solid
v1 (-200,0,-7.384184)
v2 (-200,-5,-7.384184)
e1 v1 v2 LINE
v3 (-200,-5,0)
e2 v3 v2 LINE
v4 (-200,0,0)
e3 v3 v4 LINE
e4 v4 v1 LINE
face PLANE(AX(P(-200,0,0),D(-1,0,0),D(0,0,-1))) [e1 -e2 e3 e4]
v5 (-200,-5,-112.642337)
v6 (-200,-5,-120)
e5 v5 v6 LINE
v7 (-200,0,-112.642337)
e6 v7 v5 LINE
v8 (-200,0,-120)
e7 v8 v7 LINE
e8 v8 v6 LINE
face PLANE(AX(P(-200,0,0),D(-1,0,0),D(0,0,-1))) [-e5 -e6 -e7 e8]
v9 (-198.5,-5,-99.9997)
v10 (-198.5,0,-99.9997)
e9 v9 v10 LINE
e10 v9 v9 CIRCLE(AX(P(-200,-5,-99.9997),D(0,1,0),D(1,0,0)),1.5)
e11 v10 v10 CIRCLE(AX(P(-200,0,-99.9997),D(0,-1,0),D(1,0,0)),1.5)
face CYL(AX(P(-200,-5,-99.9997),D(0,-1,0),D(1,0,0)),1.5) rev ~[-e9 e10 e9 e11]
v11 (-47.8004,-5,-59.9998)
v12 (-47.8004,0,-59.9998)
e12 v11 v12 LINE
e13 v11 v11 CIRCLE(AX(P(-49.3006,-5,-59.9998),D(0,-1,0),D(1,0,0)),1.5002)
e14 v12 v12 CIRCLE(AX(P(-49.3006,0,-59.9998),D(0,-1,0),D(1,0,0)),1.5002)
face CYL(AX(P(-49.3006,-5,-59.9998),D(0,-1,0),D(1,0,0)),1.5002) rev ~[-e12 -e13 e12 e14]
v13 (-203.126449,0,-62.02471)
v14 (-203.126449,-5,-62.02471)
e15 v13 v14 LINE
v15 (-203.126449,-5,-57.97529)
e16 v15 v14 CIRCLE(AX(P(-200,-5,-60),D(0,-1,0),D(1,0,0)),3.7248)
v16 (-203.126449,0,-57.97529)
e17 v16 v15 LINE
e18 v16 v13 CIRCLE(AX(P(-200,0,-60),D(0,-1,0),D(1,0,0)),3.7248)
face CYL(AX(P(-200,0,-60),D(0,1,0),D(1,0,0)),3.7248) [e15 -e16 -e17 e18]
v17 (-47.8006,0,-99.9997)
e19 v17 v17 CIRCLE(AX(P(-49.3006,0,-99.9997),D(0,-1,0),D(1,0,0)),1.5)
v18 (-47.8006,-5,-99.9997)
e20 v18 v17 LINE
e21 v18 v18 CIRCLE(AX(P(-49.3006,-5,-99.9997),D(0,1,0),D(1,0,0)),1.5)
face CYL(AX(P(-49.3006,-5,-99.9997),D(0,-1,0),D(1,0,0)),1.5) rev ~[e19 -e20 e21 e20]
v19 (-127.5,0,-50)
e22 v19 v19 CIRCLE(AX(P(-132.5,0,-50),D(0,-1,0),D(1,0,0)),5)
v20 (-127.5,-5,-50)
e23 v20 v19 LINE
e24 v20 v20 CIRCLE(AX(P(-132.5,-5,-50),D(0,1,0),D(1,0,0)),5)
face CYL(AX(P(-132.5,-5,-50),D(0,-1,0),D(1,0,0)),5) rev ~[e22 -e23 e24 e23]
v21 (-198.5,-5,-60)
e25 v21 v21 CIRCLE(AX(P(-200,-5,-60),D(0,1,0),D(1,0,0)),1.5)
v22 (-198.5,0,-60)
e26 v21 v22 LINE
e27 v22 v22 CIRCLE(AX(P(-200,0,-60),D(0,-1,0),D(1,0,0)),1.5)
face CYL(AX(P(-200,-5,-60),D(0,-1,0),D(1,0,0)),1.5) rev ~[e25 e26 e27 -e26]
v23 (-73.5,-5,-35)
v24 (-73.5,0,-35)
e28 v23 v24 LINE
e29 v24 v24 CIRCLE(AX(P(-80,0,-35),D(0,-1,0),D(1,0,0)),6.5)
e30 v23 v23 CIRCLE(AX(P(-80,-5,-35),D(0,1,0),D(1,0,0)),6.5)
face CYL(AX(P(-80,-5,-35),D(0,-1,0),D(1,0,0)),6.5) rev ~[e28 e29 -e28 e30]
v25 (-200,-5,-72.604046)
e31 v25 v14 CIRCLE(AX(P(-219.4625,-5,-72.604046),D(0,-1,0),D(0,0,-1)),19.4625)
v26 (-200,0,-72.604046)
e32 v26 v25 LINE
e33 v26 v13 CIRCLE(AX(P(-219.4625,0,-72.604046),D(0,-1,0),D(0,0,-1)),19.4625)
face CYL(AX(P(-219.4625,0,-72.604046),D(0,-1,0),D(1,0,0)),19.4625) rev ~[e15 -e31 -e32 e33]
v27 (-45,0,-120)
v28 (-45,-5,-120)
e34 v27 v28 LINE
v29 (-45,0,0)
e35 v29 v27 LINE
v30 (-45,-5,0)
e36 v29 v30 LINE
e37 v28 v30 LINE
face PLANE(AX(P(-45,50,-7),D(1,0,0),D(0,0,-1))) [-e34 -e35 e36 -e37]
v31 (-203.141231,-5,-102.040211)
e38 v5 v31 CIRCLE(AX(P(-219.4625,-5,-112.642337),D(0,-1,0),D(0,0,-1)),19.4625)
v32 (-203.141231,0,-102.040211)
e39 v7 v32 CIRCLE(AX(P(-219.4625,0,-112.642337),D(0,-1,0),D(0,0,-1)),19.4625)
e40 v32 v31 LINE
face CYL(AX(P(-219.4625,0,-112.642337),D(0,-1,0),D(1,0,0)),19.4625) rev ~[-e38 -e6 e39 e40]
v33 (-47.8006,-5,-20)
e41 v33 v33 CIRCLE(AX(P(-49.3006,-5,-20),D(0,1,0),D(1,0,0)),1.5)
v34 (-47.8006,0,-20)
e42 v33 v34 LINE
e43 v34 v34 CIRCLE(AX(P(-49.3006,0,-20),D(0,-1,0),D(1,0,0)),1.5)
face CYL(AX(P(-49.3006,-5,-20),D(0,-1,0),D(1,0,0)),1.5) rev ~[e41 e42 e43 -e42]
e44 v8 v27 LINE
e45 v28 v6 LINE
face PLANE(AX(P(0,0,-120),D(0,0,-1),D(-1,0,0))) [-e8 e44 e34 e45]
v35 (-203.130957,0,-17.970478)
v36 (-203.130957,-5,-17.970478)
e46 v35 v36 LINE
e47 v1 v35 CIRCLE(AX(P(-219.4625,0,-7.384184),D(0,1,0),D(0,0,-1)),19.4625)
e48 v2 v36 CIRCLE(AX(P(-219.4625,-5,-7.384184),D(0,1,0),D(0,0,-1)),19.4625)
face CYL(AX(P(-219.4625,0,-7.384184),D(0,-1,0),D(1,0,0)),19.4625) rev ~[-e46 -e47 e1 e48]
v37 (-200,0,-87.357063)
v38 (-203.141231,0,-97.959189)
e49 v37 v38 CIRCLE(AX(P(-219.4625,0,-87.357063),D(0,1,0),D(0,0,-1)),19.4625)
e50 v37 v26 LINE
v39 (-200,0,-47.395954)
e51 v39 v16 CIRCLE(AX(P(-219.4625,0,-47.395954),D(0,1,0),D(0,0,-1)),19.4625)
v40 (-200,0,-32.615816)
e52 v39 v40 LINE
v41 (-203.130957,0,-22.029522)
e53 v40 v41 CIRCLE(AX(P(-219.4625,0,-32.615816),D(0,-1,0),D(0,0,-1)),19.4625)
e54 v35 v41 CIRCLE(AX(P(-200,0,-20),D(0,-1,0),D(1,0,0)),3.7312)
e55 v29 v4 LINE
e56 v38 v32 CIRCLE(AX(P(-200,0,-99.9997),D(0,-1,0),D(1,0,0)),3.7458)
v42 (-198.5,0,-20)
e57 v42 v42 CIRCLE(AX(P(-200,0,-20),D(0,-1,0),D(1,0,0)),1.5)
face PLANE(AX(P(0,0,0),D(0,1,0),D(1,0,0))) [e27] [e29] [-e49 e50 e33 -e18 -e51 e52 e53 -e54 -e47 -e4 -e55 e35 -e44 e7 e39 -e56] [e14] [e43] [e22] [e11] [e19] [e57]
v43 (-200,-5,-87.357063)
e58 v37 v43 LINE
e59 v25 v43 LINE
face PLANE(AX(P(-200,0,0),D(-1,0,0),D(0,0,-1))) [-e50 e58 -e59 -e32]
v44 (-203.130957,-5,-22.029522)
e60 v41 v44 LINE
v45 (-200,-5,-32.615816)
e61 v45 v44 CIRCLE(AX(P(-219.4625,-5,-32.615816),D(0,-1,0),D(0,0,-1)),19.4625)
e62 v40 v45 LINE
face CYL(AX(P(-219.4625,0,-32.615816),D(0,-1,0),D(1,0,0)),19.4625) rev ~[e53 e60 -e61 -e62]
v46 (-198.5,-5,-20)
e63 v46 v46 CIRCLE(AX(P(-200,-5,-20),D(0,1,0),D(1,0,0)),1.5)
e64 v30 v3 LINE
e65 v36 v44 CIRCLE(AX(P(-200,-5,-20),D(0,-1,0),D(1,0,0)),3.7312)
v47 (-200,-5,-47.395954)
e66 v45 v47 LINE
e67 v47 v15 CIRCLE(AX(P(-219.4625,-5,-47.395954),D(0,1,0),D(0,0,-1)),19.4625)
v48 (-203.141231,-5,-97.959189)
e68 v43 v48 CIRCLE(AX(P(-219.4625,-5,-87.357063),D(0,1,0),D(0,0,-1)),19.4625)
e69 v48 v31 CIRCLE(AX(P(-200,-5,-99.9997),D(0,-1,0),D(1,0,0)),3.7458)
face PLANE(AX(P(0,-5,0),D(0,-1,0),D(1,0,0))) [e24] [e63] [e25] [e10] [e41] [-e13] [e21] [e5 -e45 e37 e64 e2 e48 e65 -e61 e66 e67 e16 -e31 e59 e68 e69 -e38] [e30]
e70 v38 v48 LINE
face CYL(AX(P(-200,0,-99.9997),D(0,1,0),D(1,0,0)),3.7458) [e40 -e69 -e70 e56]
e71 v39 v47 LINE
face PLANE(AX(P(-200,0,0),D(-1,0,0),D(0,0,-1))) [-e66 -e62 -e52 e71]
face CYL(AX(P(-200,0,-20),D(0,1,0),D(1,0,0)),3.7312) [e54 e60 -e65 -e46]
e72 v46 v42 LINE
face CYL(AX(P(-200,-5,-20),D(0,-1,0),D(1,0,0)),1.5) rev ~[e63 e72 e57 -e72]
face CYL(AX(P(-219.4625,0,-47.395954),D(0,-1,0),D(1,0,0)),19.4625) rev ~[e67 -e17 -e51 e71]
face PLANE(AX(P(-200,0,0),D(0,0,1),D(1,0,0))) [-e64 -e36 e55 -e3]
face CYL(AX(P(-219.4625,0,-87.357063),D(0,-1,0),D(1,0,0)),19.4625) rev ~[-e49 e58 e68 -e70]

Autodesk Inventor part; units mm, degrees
ref_plane "YZ Plane" through (0, 0, 0) normal (1, 0, 0) x (0, 1, 0)
ref_plane "XZ Plane" through (0, 0, 0) normal (0, 1, 0) x (-1, 0, 0)
ref_plane "XY Plane" through (0, 0, 0) normal (0, 0, 1) x (1, 0, 0)
sketch "Sketch2" plane through (0, 0, 0) normal (0, 1, 0) x (-1, 0, 0)
  line L0 (0, 0) -> (200, 0)
  line L1 (200, 0) -> (200, -120)
  line L2 (200, -120) -> (0, -120)
  line L3 (0, -120) -> (0, 0)
  dimension "d0" = 200
  dimension "d1" = 120
extrude "Extrusion1" add sketch "Sketch2" along normal blind 50
sketch "Sketch3" plane through (0, 50, 0) normal (0, 1, 0) x (1, 0, 0)
  line L0 (0, 120) -> (-200, 120) projected
  line L1 (0, 120) -> (0, 113)
  line L2 (0, 0) -> (0, 120) projected
  line L3 (-200, 0) -> (0, 0) projected
  line L4 (0, 0) -> (0, 7)
  line L5 (0, 7) -> (-45, 7)
  line L6 (-45, 7) -> (-45, 113)
  line L7 (-45, 113) -> (0, 113)
  line L8 (0, 113) -> (0, 7)
  dimension "d4" = 7
  dimension "d5" = 7
  dimension "d6" = 45
extrude "Extrusion2" cut sketch "Sketch3" against normal blind 50
sketch "Sketch6" plane through (-200, 0, 0) normal (0, 0, 1) x (1, 0, 0)
  line L0 (200, 0) -> (200, 50) projected
  line L1 (200, 0) -> (205, 0)
  line L2 (205, 0) -> (205, 50)
  line L3 (205, 50) -> (200, 50)
  line L4 (200, 50) -> (200, 0)
  dimension "d42" = 5
extrude "Extrusion4" add sketch "Sketch6" against normal blind 7
sketch "Sketch7" plane through (0, 0, -120) normal (0, 0, -1) x (-1, 0, 0)
  line L0 (45, 50) -> (0, 50) projected
  line L1 (200, 0) -> (-5, 0) projected
  line L2 (0, 50) -> (-5, 50)
  line L3 (-5, 50) -> (-5, 0)
  line L4 (-5, 0) -> (0, 0)
  line L5 (0, 0) -> (0, 50)
extrude "Extrusion5" add sketch "Sketch7" against normal blind 7
sketch "Sketch8" plane through (0, 0, 0) normal (0, -1, 0) x (1, 0, 0)
  line L0 (-200, -120) -> (-200, 0) projected
  line L1 (-200, 0) -> (5, 0) projected
  line L2 (-200, 0) -> (-195, 0)
  line L3 (-45, -113) -> (-45, -7) projected
  line L4 (-200, -120) -> (5, -120) projected
  line L5 (-45, -113) -> (-52, -113)
  line L6 (-52, -113) -> (-52, -120)
  line L7 (-52, -120) -> (-45, -120)
  line L8 (-45, -120) -> (-45, -113)
  line L9 (-45, -7) -> (5, -7) projected
  line L10 (-45, -7) -> (-52, -7)
  line L11 (-52, -7) -> (-52, 0)
  line L12 (-52, 0) -> (-45, 0)
  line L13 (-45, 0) -> (-45, -7)
  line L14 (-200, 0) -> (-193, 0)
  line L15 (-193, 0) -> (-193, -7)
  line L16 (-193, -7) -> (-200, -7)
  line L17 (-200, -7) -> (-200, 0)
  line L18 (-200, -120) -> (-193, -120)
  line L19 (-193, -120) -> (-193, -113)
  line L20 (-193, -113) -> (-200, -113)
  line L21 (-200, -113) -> (-200, -120)
  line L22 (-193, -113) -> (-52, -113)
  line L23 (-52, -113) -> (-52, -7)
  line L24 (-52, -7) -> (-193, -7)
  line L25 (-193, -7) -> (-193, -113)
  point P0 (0, 0)
  dimension "d51" = 7
  dimension "d52" = 7
  dimension "d53" = 7
  dimension "d54" = 7
  dimension "d55" = 7
  dimension "d56" = 7
  dimension "d57" = 7
extrude "Extrusion6" cut sketch "Sketch8" against normal blind 45 contours L25 L24 L23 L22
sketch "Sketch9" plane through (-45, 50, -7) normal (1, 0, 0) x (0, 0, -1)
  line L0 (106, -50) -> (0, -50) projected
  line L1 (53, -50) -> (53, 0)
  line L2 (0, 0) -> (106, 0) projected
  line L3 (53, -25) -> (106, -25)
  line L4 (106, -25) -> (84, -25)
  line L5 (84, -25) -> (84, -15)
  line L6 (84, -25) -> (84, -35)
  line L7 (84, -35) -> (72, -35)
  line L8 (72, -35) -> (72, -15)
  line L9 (72, -15) -> (84, -15)
  line L10 (84, -15) -> (84, -35)
  line L11 (106, 0) -> (0, 0)
  line L12 (53, -25) -> (0, -25)
  line L13 (0, -25) -> (22, -25)
  line L14 (106, -25) -> (86, -25)
  line L15 (86, -25) -> (69.9067, -25)
  line L16 (69.9067, -25) -> (69.9067, -38.406)
  line L17 (69.9067, -38.406) -> (86, -38.406)
  line L18 (86, -38.406) -> (86, -25)
  line L19 (86, -25) -> (69.9067, -25)
  line L20 (69.9067, -25) -> (69.9067, -11.59)
  line L21 (69.9067, -11.59) -> (86, -11.59)
  line L22 (86, -11.59) -> (86, -25)
  line L23 (53, -25) -> (0, -25)
  line L24 (0, -25) -> (22, -25)
  line L25 (22, -25) -> (22, -15)
  line L26 (22, -25) -> (22, -35)
  line L27 (22, -35) -> (34, -35)
  line L28 (34, -35) -> (34, -15)
  line L29 (34, -15) -> (22, -15)
  line L30 (22, -15) -> (22, -35)
  line L31 (0, -25) -> (20, -25)
  line L32 (20, -25) -> (36.0933, -25)
  line L33 (36.0933, -25) -> (36.0933, -38.406)
  line L34 (36.0933, -38.406) -> (20, -38.406)
  line L35 (20, -38.406) -> (20, -25)
  line L36 (20, -25) -> (36.0933, -25)
  line L37 (36.0933, -25) -> (36.0933, -11.59)
  line L38 (36.0933, -11.59) -> (20, -11.59)
  line L39 (20, -11.59) -> (20, -25)
  point P0 (-7, -50)
  dimension "d60" = 22
  dimension "d61" = 10
  dimension "d62" = 10
  dimension "d63" = 12
  dimension "d66" = 20
  dimension "d67" = 13.41
  dimension "d68" = 13.4061
extrude "Extrusion8" cut sketch "Sketch9" against normal blind 10
sketch "Sketch10" plane through (0, 45, 0) normal (0, -1, 0) x (1, 0, 0)
  line L0 (-193, -113) -> (-193, -7) projected
  line L1 (-193, -60) -> (-148, -60)
  line L2 (-148, -7) -> (-143, -7)
  line L3 (-143, -7) -> (-143, -95.0021)
  line L4 (-143, -95.0021) -> (-148, -95.0021)
  line L5 (-148, -95.0021) -> (-148, -7)
  point P0 (0, 0)
  dimension "d71" = 45
  dimension "d72" = 5
extrude "Extrusion9" add sketch "Sketch10" along normal blind 40
sketch "Sketch11" plane through (0, 0, 0) normal (0, -1, 0) x (1, 0, 0)
  line L0 (-148, -7) -> (-148, -95.0021) projected
  line L1 (-148, -95.0021) -> (-148, -114.483)
  line L2 (-52, -113) -> (-193, -113) projected
  line L3 (-193, -113) -> (-148, -113)
  line L4 (-148, -113) -> (-148, -117)
  line L5 (-148, -117) -> (-193, -117)
  line L6 (-193, -117) -> (-193, -113)
  line L7 (-193, -7) -> (-52, -7) projected
  line L8 (-193, -7) -> (-148, -7)
  line L9 (-148, -7) -> (-148, -3)
  line L10 (-148, -3) -> (-193, -3)
  line L11 (-193, -3) -> (-193, -7)
  point P0 (0, 0)
  dimension "d75" = 4
  dimension "d76" = 4
extrude "Extrusion10" cut sketch "Sketch11" against normal blind 45
sketch "Sketch12" plane through (-52, 0, -113) normal (0, 0, 1) x (1, 0, 0)
  line L0 (0, 0) -> (0, 45) projected
  line L1 (0, 45) -> (-91, 45)
  line L2 (-91, 45) -> (-91, 0)
  line L3 (-91, 0) -> (0, 0)
  line L4 (0, 0) -> (0, 45)
  line L5 (-69.4543, 22.5) -> (-21.0513, 22.5) construction
  line L6 (-69.4543, 10.4971) -> (-21.0513, 10.4971)
  line L7 (-21.0513, 34.5029) -> (-69.4543, 34.5029)
  arc A0 (-69.4543, 34.5029) -> (-69.4543, 10.4971) centre (-69.4543, 22.5) ccw
  arc A1 (-21.0513, 10.4971) -> (-21.0513, 34.5029) centre (-21.0513, 22.5) ccw
  point P0 (52, 0)
  point P1 (-45.2528, 22.5)
extrude "Extrusion11" cut sketch "Sketch12" along normal mid plane 2000 contours A0 L7 A1 L6
sketch "Sketch13" plane through (0, 0, 0) normal (0, -1, 0) x (1, 0, 0)
  line L0 (-200, -120) -> (-200, 0) projected
  line L1 (-200, -60) -> (-200, -100)
  line L2 (-200, -100) -> (-200, -20)
  circle A0 centre (-200, -20) radius 3.75
  circle A1 centre (-200, -60) radius 3.75
  circle A2 centre (-200, -100) radius 3.75
  circle A3 centre (-49.267, -60) radius 3.75
  circle A4 centre (-49.267, -100) radius 3.75
  circle A5 centre (-49.267, -20) radius 3.75
  line L3 (-45, -113) -> (-45, -7) projected
  point P0 (0, 0)
  dimension "d81" = 40
  dimension "d82" = 80
  dimension "d83" = 7.5
  dimension "d84" = 7.5
  dimension "d85" = 7.5
extrude "Extrusion12" add sketch "Sketch13" against normal blind 17.5 contours A2 L0 | L0 A2 | A1 L0 | L0 A1 | A0 L0 | L0 A0 | A3
extrude "Extrusion13" add sketch "Sketch13" against normal blind 17.5 contours A3 | A4 | A5
sketch "Sketch16" plane through (0, 0, 0) normal (0, -1, 0) x (1, 0, 0)
  arc A0 (-200, -16.25) -> (-200, -23.75) centre (-200, -20) ccw projected
  circle A1 centre (-200, -20) radius 1.5
  line L0 (-200, -120) -> (-200, 0) projected
  circle A2 centre (-200, -60) radius 1.5
  circle A3 centre (-200, -99.9997) radius 1.5
  circle A4 centre (-49.3006, -99.9997) radius 1.5
  circle A5 centre (-49.3006, -60) radius 1.5
  circle A6 centre (-49.3006, -20) radius 1.5
  point P0 (0, 0)
  dimension "d90" = 3
  dimension "d91" = 3
  dimension "d92" = 3
  dimension "d93" = 3
  dimension "d94" = 3
  dimension "d95" = 3
extrude "Extrusion14" cut sketch "Sketch16" along normal mid plane 15 contours L0 A1 | A1 L0 | A3 L0 | L0 A3 | A2 L0 | L0 A2 | A4 | A5 | A6
fillet "Fillet1" radius 3.5875 3 edges at (-203.75, 17.5, -60) (-203.75, 17.5, -100) (-203.75, 17.5, -20)
fillet "Fillet2" radius 2 3 edges at (-53.017, 17.5, -100) (-53.017, 17.5, -60) (-53.017, 17.5, -20)
sketch "Sketch17" plane through (0, 45, 0) normal (0, -1, 0) x (1, 0, 0)
  line L0 (-148, -7) -> (-52, -7) projected
  line L1 (-142.7275, -7) -> (-52, -7)
  line L2 (-52, -7) -> (-52, -113)
  line L3 (-52, -113) -> (-142.7275, -113)
  circle A0 centre (-49.3006, -60) radius 1.5 projected
  line L4 (-49.3006, -60) -> (-200.2165, -60)
  line L5 (-121.4543, -7) -> (-73.0513, -7) projected
  line L6 (-97.2528, -7) -> (-64.7528, -7)
  line L7 (-64.7528, -7) -> (-97.2528, -7)
  line L8 (-97.2528, -7) -> (-129.7528, -7)
  line L9 (-148, -7) -> (-143, -7) projected
  line L10 (-143, -7) -> (-129.7528, -7)
  line L11 (-143, -7) -> (-64.7528, -7)
  circle A1 centre (-64.7528, -101.7496) radius 2
  circle A2 centre (-64.7528, -18.25) radius 2
  circle A3 centre (-129.7528, -18.25) radius 2
  circle A4 centre (-129.7528, -101.7496) radius 2
  point P0 (0, 0)
  dimension "d105" = 32.5
  dimension "d106" = 32.5
  dimension "d107" = 32.5
  dimension "d108" = 4
  dimension "d109" = 4
  dimension "d110" = 4
  dimension "d111" = 4
extrude "Extrusion15" cut sketch "Sketch17" against normal blind 15 contours A1 | A2 | A3 | A4
fillet "Fillet3" radius 19.4625 15 edges at (-200, 16.4492, -17.3007) (-200, 16.4492, -22.6993) (-200, 17.5, -20) (-200, 6.9562, -16.25) (-200, 6.9562, -23.75) (-200, 16.4492, -62.6992) (-200, 16.4492, -57.3008) (-200, 17.5, -60) (-200, 6.9562, -63.75) (-200, 6.9562, -56.25) (-200, 16.4492, -102.6993) (-200, 16.4492, -97.3007) (-200, 17.5, -100) (-200, 6.9562, -103.75) (-200, 6.9562, -96.25)
sketch "Sketch18" plane through (-200, 0, -120) normal (0, 0, -1) x (-1, 0, 0)
  line L0 (-155, 50) -> (-155, 0) projected
  line L1 (-155, 0) -> (-155, 50)
  circle A0 centre (0, 0) radius 11.05
  circle A1 centre (-15.5, 15.5) radius 1.75
  circle A2 centre (15.5, 15.5) radius 1.75
  circle A3 centre (15.5, -15.5) radius 1.75
  circle A4 centre (-15.5, -15.5) radius 1.75
  circle A5 centre (0, 0) radius 11.05
  circle A6 centre (-15.5, 15.5) radius 1.75
  circle A7 centre (15.5, 15.5) radius 1.75
  circle A8 centre (15.5, -15.5) radius 1.75
  circle A9 centre (-15.5, -15.5) radius 1.75
  circle A10 centre (0, 0) radius 11.05
  circle A11 centre (-15.5, 15.5) radius 1.75
  circle A12 centre (15.5, 15.5) radius 1.75
  circle A13 centre (15.5, -15.5) radius 1.75
  circle A14 centre (-15.5, -15.5) radius 1.75
  line L2 (-205, 0) -> (-205, 50) projected
  line L3 (-155, 0) -> (-205, 0)
  line L4 (-205, 0) -> (-205, 50)
  line L5 (-205, 50) -> (-155, 50)
  line L6 (-155, 50) -> (-155, 0)
  circle A15 centre (-180, 25) radius 11.5
  line L7 (-180, 25) -> (-164.5, 25)
  line L8 (-164.5, 25) -> (-164.5, 50)
  line L9 (-205, 50) -> (-155, 50) projected
  line L10 (-205, 0) -> (0, 0) projected
  line L11 (-164.5, 0) -> (-164.5, 25)
  line L12 (-180, 25) -> (-195.5, 25)
  line L13 (-195.5, 25) -> (-195.5, 50)
  line L14 (-195.5, 0) -> (-195.5, 25)
  line L15 (-180, 25) -> (-180, 9.5)
  line L16 (-180, 25) -> (-180, 40.5)
  line L17 (-180, 40.5) -> (-164.5, 40.5)
  line L18 (-180, 40.5) -> (-195.5, 40.5)
  line L19 (-180, 9.5) -> (-164.5, 9.5)
  line L20 (-180, 9.5) -> (-195.5, 9.5)
  circle A16 centre (-164.5, 9.5) radius 2.5
  circle A17 centre (-164.5, 40.5) radius 2.5
  circle A18 centre (-195.5, 40.5) radius 2.5
  circle A19 centre (-195.5, 9.5) radius 2.5
  point P0 (-200, 0)
  dimension "d115" = 22.1
  dimension "d116" = 31
  dimension "d117" = 31
  dimension "d118" = 31
  dimension "d119" = 31
  dimension "d120" = 3.5
  dimension "d121" = 3.5
  dimension "d122" = 3.5
  dimension "d123" = 3.5
  dimension "d124" = 15.5
  dimension "d125" = 15.5
  dimension "d126" = 15.5
  dimension "d127" = 15.5
  dimension "d128" = 22.1
  dimension "d129" = 31
  dimension "d130" = 31
  dimension "d131" = 31
  dimension "d132" = 31
  dimension "d133" = 3.5
  dimension "d134" = 3.5
  dimension "d135" = 3.5
  dimension "d136" = 3.5
  dimension "d137" = 15.5
  dimension "d138" = 15.5
  dimension "d139" = 15.5
  dimension "d140" = 15.5
  dimension "d141" = 22.1
  dimension "d142" = 31
  dimension "d143" = 31
  dimension "d144" = 31
  dimension "d145" = 31
  dimension "d146" = 3.5
  dimension "d147" = 3.5
  dimension "d148" = 3.5
  dimension "d149" = 3.5
  dimension "d150" = 15.5
  dimension "d151" = 15.5
  dimension "d152" = 15.5
  dimension "d153" = 15.5
  dimension "d154" = 23
  dimension "d156" = 15.5
  dimension "d157" = 15.5
  dimension "d158" = 5
  dimension "d159" = 5
  dimension "d160" = 5
  dimension "d161" = 5
extrude "Extrusion16" cut sketch "Sketch18" against normal blind 2000 contours A17 L8 | L8 L17 A17 | A16 L19 L11 | L11 A16 | A18 L18 L13 | L13 A18 | L8 A17 L17 | A19 L14 | L14 L20 A19 | L19 A16 L11 | L18 A18 L13 | L14 A19 L20 | L16 L12 A15 | A15 L7 L16 | L15 L7 A15 | A15 L12 L15
sketch "Sketch19" plane through (0, 45, 0) normal (0, -1, 0) x (1, 0, 0)
  circle A0 centre (-129.7528, -101.7496) radius 2 projected
  circle A1 centre (-129.7528, -18.25) radius 2 projected
  line L0 (-129.7528, -101.7496) -> (-129.7528, -18.25)
  circle A2 centre (-64.7528, -18.25) radius 2 projected
  line L1 (-129.7528, -18.25) -> (-64.7528, -18.25)
  circle A3 centre (-64.7528, -101.7496) radius 2 projected
  line L2 (-64.7528, -18.25) -> (-64.7528, -101.7496)
  line L3 (-64.7528, -101.7496) -> (-129.7528, -101.7496)
  line L4 (-87.014, -168.9687) -> (-85.0378, -168.9687)
  circle A4 centre (-49.3006, -20) radius 1.5 projected
  circle A5 centre (-49.3006, -20) radius 1.5
  circle A6 centre (-49.3006, -59.9998) radius 1.5002
  circle A7 centre (-49.3006, -99.9997) radius 1.5 projected
  circle A8 centre (-49.3006, -99.9997) radius 1.5
  line L5 (-200, -120) -> (-200, 0) projected
  circle A9 centre (-200, -99.9997) radius 1.5
  circle A10 centre (-200, -60) radius 1.5 projected
  circle A11 centre (-200, -60) radius 1.5
  circle A12 centre (-200, -20) radius 1.5
  point P0 (0, 0)
extrude "Extrusion17" add sketch "Sketch19" along normal blind 100 contours A4 | A6 | A7 | A9 L5 | L5 A9 | A10 L5 | L5 A10 | A12 L5 | L5 A12
sketch "Sketch20" plane through (0, 0, 0) normal (0, -1, 0) x (1, 0, 0)
  line L0 (5, -120) -> (-200, -120) projected
  line L1 (-45, 0) -> (-200, 0)
  line L2 (-200, 0) -> (-200, -120)
  line L3 (-200, -120) -> (-45, -120)
  line L4 (-45, -120) -> (-45, 0)
  line L5 (-200, -61.5) -> (-200, -58.5) projected
  circle A0 centre (-200, -60) radius 3.7248
  line L6 (-200, -101.4997) -> (-200, -98.4997) projected
  circle A1 centre (-200, -99.9997) radius 3.7458
  line L7 (-200, -21.5) -> (-200, -18.5) projected
  circle A2 centre (-200, -20) radius 3.7312
  point P0 (0, 0)
  point P1 (-200, -16.2688)
  point P2 (-200, -23.7312)
  point P3 (-200, -56.2752)
  point P4 (-200, -63.7248)
  point P5 (-200, -96.2539)
  point P6 (-200, -103.7454)
extrude "Extrusion18" add sketch "Sketch20" along normal blind 5
fillet "Fillet4" radius 19.4625 6 edges at (-200, -2.5, -96.2539) (-200, -2.5, -103.7454) (-200, -2.5, -63.7248) (-200, -2.5, -56.2752) (-200, -2.5, -16.2688) (-200, -2.5, -23.7312)
sketch "Sketch21" plane through (0, -5, 0) normal (0, -1, 0) x (1, 0, 0)
  point P0 (0, 0)
sketch "Sketch22" plane through (0, 50, 0) normal (0, 1, 0) x (1, 0, 0)
  line L0 (-218.9045, 160.531) -> (29.7585, 160.531)
  line L1 (29.7585, 160.531) -> (29.7585, -28.8143)
  line L2 (29.7585, -28.8143) -> (-218.9045, -28.8143)
  line L3 (-218.9045, -28.8143) -> (-218.9045, 160.531)
  point P0 (0, 0)
extrude "Extrusion19" cut sketch "Sketch22" against normal blind 50
sketch "Sketch24" plane through (0, -5, 0) normal (0, -1, 0) x (1, 0, 0)
  circle A0 centre (-49.3006, -20) radius 1.5 projected
  circle A1 centre (-49.3006, -20) radius 1.5
  circle A2 centre (-49.3006, -59.9998) radius 1.5002 projected
  circle A3 centre (-49.3006, -59.9998) radius 1.5002
  circle A4 centre (-49.3006, -99.9997) radius 1.5 projected
  circle A5 centre (-49.3006, -99.9997) radius 1.5
  circle A6 centre (-200, -99.9997) radius 1.5 projected
  circle A7 centre (-200, -99.9997) radius 1.5
  circle A8 centre (-200, -60) radius 1.5 projected
  circle A9 centre (-200, -60) radius 1.5
  circle A10 centre (-200, -20) radius 1.5 projected
  circle A11 centre (-200, -20) radius 1.5
  point P0 (0, 0)
extrude "Extrusion20" cut sketch "Sketch24" along normal mid plane 500
sketch "Sketch25" plane through (0, -5, 0) normal (0, -1, 0) x (1, 0, 0)
  line L0 (-45, -120) -> (-45, 0) projected
  line L1 (-45, 0) -> (-132.5, 0)
  line L2 (-132.5, 0) -> (-132.5, -50)
  line L3 (-132.5, -50) -> (-45, -50)
  line L4 (-45, -50) -> (-45, 0)
  circle A0 centre (-132.5, -50) radius 5
  line L5 (-45, 0) -> (-200, 0) projected
  line L6 (-45, 0) -> (-80, 0)
  line L7 (-80, 0) -> (-80, -35)
  line L8 (-80, -35) -> (-45, -35)
  line L9 (-45, -35) -> (-45, 0)
  circle A1 centre (-80, -35) radius 6.5
  point P0 (0, 0)
  dimension "d181" = 87.5
  dimension "d182" = 50
  dimension "d183" = 10
  dimension "d184" = 35
  dimension "d185" = 35
  dimension "d186" = 13
extrude "Extrusion21" cut sketch "Sketch25" against normal blind 500 contours A0 L2 L3 | L3 L2 A0 | A1 L7 L8 | L8 L7 A1
equation "\"d69\" = d62"
properties part number "chassis_cap"
